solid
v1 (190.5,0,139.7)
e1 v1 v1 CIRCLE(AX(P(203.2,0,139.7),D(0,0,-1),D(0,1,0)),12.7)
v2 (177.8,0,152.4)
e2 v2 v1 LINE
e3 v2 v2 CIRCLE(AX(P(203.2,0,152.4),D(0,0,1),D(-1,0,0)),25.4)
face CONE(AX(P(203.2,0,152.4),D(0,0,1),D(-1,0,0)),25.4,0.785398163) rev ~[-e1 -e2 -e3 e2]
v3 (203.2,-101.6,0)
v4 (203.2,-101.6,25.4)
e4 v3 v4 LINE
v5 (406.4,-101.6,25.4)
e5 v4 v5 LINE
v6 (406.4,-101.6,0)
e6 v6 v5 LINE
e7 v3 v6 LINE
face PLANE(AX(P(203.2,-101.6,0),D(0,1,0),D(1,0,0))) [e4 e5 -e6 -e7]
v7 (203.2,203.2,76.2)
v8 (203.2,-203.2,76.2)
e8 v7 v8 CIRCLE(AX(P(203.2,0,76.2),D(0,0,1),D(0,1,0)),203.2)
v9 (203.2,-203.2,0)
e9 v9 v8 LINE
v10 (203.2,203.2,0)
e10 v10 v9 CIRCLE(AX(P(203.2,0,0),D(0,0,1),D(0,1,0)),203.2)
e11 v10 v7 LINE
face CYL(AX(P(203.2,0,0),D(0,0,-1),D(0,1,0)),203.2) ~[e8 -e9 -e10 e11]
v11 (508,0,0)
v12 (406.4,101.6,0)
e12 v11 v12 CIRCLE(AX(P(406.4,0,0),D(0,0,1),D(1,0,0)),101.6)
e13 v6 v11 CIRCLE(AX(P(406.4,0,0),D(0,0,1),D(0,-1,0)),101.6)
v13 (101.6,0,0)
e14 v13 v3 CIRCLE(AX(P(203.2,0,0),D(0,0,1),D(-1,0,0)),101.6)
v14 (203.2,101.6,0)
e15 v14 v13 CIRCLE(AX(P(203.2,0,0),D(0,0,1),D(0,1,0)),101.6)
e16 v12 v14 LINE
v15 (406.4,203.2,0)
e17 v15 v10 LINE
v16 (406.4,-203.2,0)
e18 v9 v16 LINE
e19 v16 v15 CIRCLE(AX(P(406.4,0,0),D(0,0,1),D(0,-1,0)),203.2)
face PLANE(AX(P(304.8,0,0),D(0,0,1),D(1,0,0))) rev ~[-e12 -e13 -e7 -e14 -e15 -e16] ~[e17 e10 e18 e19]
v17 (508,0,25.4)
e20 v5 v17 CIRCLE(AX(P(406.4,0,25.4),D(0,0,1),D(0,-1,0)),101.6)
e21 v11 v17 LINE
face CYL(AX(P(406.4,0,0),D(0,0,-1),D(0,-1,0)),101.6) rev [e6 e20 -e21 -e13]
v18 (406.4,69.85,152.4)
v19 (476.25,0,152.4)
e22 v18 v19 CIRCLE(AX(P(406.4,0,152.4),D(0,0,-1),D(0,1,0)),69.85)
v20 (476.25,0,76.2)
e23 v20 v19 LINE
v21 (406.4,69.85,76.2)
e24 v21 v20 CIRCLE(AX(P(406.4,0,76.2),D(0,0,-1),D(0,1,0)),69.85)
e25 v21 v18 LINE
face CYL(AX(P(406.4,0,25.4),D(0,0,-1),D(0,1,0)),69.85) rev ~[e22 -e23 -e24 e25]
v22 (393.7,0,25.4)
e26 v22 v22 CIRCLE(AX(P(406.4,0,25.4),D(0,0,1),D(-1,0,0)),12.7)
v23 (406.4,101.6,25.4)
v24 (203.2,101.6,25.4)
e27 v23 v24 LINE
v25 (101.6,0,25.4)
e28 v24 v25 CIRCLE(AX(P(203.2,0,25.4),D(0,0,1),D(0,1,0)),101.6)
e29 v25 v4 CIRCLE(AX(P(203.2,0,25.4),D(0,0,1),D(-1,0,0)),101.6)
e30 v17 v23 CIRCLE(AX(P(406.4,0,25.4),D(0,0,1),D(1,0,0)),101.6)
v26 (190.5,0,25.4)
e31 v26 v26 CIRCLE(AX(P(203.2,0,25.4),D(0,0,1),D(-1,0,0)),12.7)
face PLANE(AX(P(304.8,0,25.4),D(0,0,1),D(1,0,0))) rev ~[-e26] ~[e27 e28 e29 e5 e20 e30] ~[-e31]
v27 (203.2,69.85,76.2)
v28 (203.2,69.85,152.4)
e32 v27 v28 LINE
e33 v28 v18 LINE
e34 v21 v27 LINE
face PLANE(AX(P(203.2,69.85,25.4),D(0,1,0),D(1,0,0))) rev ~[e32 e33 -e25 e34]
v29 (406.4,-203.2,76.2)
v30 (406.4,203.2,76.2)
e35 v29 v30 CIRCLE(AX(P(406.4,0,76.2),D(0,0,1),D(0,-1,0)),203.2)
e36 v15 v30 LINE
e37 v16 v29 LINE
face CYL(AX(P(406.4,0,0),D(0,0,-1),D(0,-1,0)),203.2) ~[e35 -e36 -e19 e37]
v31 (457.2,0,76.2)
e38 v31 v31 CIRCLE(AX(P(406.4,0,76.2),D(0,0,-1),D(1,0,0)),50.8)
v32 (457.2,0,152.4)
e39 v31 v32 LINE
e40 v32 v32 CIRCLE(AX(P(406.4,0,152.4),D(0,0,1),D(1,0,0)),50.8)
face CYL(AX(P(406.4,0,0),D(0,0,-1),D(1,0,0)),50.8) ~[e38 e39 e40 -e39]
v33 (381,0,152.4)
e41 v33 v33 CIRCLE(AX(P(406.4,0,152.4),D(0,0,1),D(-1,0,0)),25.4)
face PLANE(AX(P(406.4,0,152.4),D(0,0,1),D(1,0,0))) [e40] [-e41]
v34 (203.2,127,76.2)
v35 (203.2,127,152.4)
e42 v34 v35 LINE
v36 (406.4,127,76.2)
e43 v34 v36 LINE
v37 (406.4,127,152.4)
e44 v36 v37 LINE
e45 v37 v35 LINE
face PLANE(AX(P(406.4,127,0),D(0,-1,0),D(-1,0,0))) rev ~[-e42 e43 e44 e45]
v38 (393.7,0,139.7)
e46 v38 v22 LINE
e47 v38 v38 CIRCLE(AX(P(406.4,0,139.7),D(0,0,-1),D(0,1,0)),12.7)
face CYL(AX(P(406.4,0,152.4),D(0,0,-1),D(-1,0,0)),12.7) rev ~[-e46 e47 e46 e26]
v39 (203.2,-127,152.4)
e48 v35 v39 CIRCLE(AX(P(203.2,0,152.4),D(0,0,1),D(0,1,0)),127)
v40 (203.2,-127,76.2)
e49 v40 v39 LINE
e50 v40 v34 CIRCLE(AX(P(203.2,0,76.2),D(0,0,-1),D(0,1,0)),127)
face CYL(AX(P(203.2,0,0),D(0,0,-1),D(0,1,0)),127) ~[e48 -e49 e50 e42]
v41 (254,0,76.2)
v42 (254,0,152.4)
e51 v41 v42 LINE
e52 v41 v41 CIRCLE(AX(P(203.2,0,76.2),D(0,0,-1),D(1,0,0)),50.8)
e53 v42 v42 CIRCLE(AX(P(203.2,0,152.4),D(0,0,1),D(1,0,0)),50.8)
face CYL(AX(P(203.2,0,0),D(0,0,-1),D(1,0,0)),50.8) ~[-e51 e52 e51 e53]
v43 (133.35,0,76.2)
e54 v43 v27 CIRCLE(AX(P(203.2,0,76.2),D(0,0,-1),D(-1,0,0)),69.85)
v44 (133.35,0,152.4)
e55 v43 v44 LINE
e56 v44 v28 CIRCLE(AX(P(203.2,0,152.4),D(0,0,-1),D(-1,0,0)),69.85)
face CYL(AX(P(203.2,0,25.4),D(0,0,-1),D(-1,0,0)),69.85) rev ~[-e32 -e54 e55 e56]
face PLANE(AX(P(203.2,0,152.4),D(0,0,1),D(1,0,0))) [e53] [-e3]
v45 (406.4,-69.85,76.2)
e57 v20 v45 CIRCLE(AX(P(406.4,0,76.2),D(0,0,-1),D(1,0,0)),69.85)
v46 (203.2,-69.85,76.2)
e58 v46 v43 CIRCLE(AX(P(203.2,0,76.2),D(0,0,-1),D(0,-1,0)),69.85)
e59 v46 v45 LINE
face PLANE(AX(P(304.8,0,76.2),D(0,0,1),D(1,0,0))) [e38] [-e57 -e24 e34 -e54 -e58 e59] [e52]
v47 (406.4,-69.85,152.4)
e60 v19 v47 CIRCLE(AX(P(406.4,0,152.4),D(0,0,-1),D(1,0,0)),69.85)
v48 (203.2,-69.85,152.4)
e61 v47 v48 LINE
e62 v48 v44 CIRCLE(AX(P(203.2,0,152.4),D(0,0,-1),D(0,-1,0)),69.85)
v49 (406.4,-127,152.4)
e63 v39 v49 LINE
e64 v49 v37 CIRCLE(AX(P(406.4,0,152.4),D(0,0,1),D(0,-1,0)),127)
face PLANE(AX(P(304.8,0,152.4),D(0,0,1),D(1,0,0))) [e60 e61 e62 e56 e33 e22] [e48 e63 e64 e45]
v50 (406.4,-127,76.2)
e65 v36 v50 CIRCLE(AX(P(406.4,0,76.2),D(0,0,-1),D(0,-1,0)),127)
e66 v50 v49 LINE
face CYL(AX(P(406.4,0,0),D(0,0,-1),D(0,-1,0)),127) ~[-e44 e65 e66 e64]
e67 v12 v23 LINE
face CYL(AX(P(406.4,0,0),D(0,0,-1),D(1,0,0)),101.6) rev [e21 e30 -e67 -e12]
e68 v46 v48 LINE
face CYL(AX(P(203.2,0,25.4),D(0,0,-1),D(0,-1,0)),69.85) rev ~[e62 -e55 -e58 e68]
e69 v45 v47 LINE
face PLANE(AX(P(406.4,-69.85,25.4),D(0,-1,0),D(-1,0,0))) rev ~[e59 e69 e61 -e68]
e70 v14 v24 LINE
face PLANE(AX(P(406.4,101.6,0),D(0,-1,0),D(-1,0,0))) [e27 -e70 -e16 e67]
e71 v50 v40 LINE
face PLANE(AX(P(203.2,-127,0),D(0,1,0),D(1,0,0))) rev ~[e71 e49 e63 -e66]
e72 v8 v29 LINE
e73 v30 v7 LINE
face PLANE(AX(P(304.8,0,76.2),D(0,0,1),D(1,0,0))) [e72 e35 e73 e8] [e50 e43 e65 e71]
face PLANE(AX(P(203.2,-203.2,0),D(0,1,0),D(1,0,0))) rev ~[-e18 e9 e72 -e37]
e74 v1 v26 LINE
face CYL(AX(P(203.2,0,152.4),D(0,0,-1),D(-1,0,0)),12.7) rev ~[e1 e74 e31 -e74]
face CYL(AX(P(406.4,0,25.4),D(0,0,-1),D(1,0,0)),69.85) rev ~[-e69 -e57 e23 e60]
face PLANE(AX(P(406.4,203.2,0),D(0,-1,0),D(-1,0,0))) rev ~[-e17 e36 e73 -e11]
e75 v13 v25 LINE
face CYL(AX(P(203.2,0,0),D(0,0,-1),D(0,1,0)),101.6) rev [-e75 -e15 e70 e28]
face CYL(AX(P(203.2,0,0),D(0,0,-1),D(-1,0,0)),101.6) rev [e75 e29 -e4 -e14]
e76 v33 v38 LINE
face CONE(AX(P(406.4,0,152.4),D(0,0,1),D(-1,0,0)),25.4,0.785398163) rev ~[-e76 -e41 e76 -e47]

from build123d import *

# Parameters (mm, degrees)
F0_R           = 50.8
F0_R_2         = 12.7
F1_DEPTH       = 76.2
F2_DEPTH       = 152.4
F3_DEPTH       = 152.4
F4_DEPTH       = 25.4
F5_START       = 25.4
F5_DEPTH       = 127
F7_D           = 25.4
F7_CSINK_D     = 50.8
F7_CSINK_ANGLE = 90


# Not quite as in the source:
# - a feature names something its author has since deleted; it is built from what else it names


with BuildPart() as f1:
    # F0 (on Top) → F1 (new body)
    with BuildSketch(Plane.XY):
        with BuildLine():
            ThreePointArc((0, 0), (59.5159020629, -143.6840979371), (203.2, -203.2))
            Line((203.2, -203.2), (406.4, -203.2))
            ThreePointArc((406.4, -203.2), (550.0840979371, -143.6840979371), (609.6, 0))
            ThreePointArc((609.6, 0), (550.0840979371, 143.6840979371), (406.4, 203.2))
            Line((406.4, 203.2), (203.2, 203.2))
            ThreePointArc((203.2, 203.2), (59.5159020629, 143.6840979371), (0, 0))
        make_face()
        with BuildLine():
            Line((406.4, -127), (203.2, -127))
            ThreePointArc((203.2, -127), (113.3974387893, -89.8025612107), (76.2, 0))
            ThreePointArc((76.2, 0), (113.3974387893, 89.8025612107), (203.2, 127))
            Line((203.2, 127), (406.4, 127))
            ThreePointArc((406.4, 127), (496.2025612107, 89.8025612107), (533.4, 0))
            ThreePointArc((533.4, 0), (496.2025612107, -89.8025612107), (406.4, -127))
        make_face(mode=Mode.SUBTRACT)
        with BuildLine():
            ThreePointArc((76.2, 0), (113.3974387893, -89.8025612107), (203.2, -127))
            Line((203.2, -127), (406.4, -127))
            ThreePointArc((406.4, -127), (496.2025612107, -89.8025612107), (533.4, 0))
            ThreePointArc((533.4, 0), (496.2025612107, 89.8025612107), (406.4, 127))
            Line((406.4, 127), (203.2, 127))
            ThreePointArc((203.2, 127), (113.3974387893, 89.8025612107), (76.2, 0))
        make_face()
        with BuildLine():
            Line((406.4, -101.6), (203.2, -101.6))
            ThreePointArc((203.2, -101.6), (131.3579510314, -71.8420489686), (101.6, 0))
            ThreePointArc((101.6, 0), (131.3579510314, 71.8420489686), (203.2, 101.6))
            Line((203.2, 101.6), (406.4, 101.6))
            ThreePointArc((406.4, 101.6), (478.2420489686, 71.8420489686), (508, 0))
            ThreePointArc((508, 0), (478.2420489686, -71.8420489686), (406.4, -101.6))
        make_face(mode=Mode.SUBTRACT)
        with BuildLine():
            ThreePointArc((101.6, 0), (131.3579510314, -71.8420489686), (203.2, -101.6))
            Line((203.2, -101.6), (406.4, -101.6))
            ThreePointArc((406.4, -101.6), (478.2420489686, -71.8420489686), (508, 0))
            ThreePointArc((508, 0), (478.2420489686, 71.8420489686), (406.4, 101.6))
            Line((406.4, 101.6), (203.2, 101.6))
            ThreePointArc((203.2, 101.6), (131.3579510314, 71.8420489686), (101.6, 0))
        make_face()
        with BuildLine():
            ThreePointArc((476.25, 0), (455.7914086659, -49.3914086659), (406.4, -69.85))
            Line((406.4, -69.85), (203.2, -69.85))
            ThreePointArc((203.2, -69.85), (153.8085913341, -49.3914086659), (133.35, 0))
            ThreePointArc((133.35, 0), (153.8085913341, 49.3914086659), (203.2, 69.85))
            Line((203.2, 69.85), (406.4, 69.85))
            ThreePointArc((406.4, 69.85), (455.7914086659, 49.3914086659), (476.25, 0))
        make_face(mode=Mode.SUBTRACT)
        with BuildLine():
            Line((203.2, -69.85), (406.4, -69.85))
            ThreePointArc((406.4, -69.85), (455.7914086659, -49.3914086659), (476.25, 0))
            ThreePointArc((476.25, 0), (455.7914086659, 49.3914086659), (406.4, 69.85))
            Line((406.4, 69.85), (203.2, 69.85))
            ThreePointArc((203.2, 69.85), (153.8085913341, 49.3914086659), (133.35, 0))
            ThreePointArc((133.35, 0), (153.8085913341, -49.3914086659), (203.2, -69.85))
        make_face()
        with Locations((203.2, 0)):
            Circle(F0_R, mode=Mode.SUBTRACT)
        with Locations((406.4, 0)):
            Circle(F0_R, mode=Mode.SUBTRACT)
        with Locations((406.4, 0)):
            Circle(F0_R)
        with Locations((406.4, 0)):
            Circle(F0_R_2, mode=Mode.SUBTRACT)
        with Locations((203.2, 0)):
            Circle(F0_R)
        with Locations((203.2, 0)):
            Circle(F0_R_2, mode=Mode.SUBTRACT)
    extrude(amount=F1_DEPTH)

    # F0 (on Top) → F2 (join)
    with BuildSketch(Plane.XY):
        with BuildLine():
            ThreePointArc((76.2, 0), (113.3974387893, -89.8025612107), (203.2, -127))
            Line((203.2, -127), (406.4, -127))
            ThreePointArc((406.4, -127), (496.2025612107, -89.8025612107), (533.4, 0))
            ThreePointArc((533.4, 0), (496.2025612107, 89.8025612107), (406.4, 127))
            Line((406.4, 127), (203.2, 127))
            ThreePointArc((203.2, 127), (113.3974387893, 89.8025612107), (76.2, 0))
        make_face()
        with BuildLine():
            Line((406.4, -101.6), (203.2, -101.6))
            ThreePointArc((203.2, -101.6), (131.3579510314, -71.8420489686), (101.6, 0))
            ThreePointArc((101.6, 0), (131.3579510314, 71.8420489686), (203.2, 101.6))
            Line((203.2, 101.6), (406.4, 101.6))
            ThreePointArc((406.4, 101.6), (478.2420489686, 71.8420489686), (508, 0))
            ThreePointArc((508, 0), (478.2420489686, -71.8420489686), (406.4, -101.6))
        make_face(mode=Mode.SUBTRACT)
    extrude(amount=F2_DEPTH)

    # F0 (on Top) → F3 (join)
    with BuildSketch(Plane.XY):
        with Locations((203.2, 0)):
            Circle(F0_R)
        with Locations((203.2, 0)):
            Circle(F0_R_2, mode=Mode.SUBTRACT)
        with Locations((406.4, 0)):
            Circle(F0_R)
        with Locations((406.4, 0)):
            Circle(F0_R_2, mode=Mode.SUBTRACT)
        with Locations((203.2, 0)):
            Circle(F0_R_2)
        with Locations((406.4, 0)):
            Circle(F0_R_2)
    extrude(amount=F3_DEPTH)

    # F0 (on Top) → F4 (cut)
    with BuildSketch(Plane.XY):
        with BuildLine():
            ThreePointArc((101.6, 0), (131.3579510314, -71.8420489686), (203.2, -101.6))
            Line((203.2, -101.6), (406.4, -101.6))
            ThreePointArc((406.4, -101.6), (478.2420489686, -71.8420489686), (508, 0))
            ThreePointArc((508, 0), (478.2420489686, 71.8420489686), (406.4, 101.6))
            Line((406.4, 101.6), (203.2, 101.6))
            ThreePointArc((203.2, 101.6), (131.3579510314, 71.8420489686), (101.6, 0))
        make_face()
        with BuildLine():
            ThreePointArc((476.25, 0), (455.7914086659, -49.3914086659), (406.4, -69.85))
            Line((406.4, -69.85), (203.2, -69.85))
            ThreePointArc((203.2, -69.85), (153.8085913341, -49.3914086659), (133.35, 0))
            ThreePointArc((133.35, 0), (153.8085913341, 49.3914086659), (203.2, 69.85))
            Line((203.2, 69.85), (406.4, 69.85))
            ThreePointArc((406.4, 69.85), (455.7914086659, 49.3914086659), (476.25, 0))
        make_face(mode=Mode.SUBTRACT)
        with BuildLine():
            Line((203.2, -69.85), (406.4, -69.85))
            ThreePointArc((406.4, -69.85), (455.7914086659, -49.3914086659), (476.25, 0))
            ThreePointArc((476.25, 0), (455.7914086659, 49.3914086659), (406.4, 69.85))
            Line((406.4, 69.85), (203.2, 69.85))
            ThreePointArc((203.2, 69.85), (153.8085913341, 49.3914086659), (133.35, 0))
            ThreePointArc((133.35, 0), (153.8085913341, -49.3914086659), (203.2, -69.85))
        make_face()
        with Locations((203.2, 0)):
            Circle(F0_R, mode=Mode.SUBTRACT)
        with Locations((406.4, 0)):
            Circle(F0_R, mode=Mode.SUBTRACT)
        with Locations((203.2, 0)):
            Circle(F0_R)
        with Locations((203.2, 0)):
            Circle(F0_R_2, mode=Mode.SUBTRACT)
        with Locations((406.4, 0)):
            Circle(F0_R)
        with Locations((406.4, 0)):
            Circle(F0_R_2, mode=Mode.SUBTRACT)
    extrude(amount=F4_DEPTH, mode=Mode.SUBTRACT)

    # F0 (on Top) → F5 (join)
    with BuildSketch(Plane.XY.offset(F5_START)):
        with BuildLine():
            ThreePointArc((101.6, 0), (131.3579510314, -71.8420489686), (203.2, -101.6))
            Line((203.2, -101.6), (406.4, -101.6))
            ThreePointArc((406.4, -101.6), (478.2420489686, -71.8420489686), (508, 0))
            ThreePointArc((508, 0), (478.2420489686, 71.8420489686), (406.4, 101.6))
            Line((406.4, 101.6), (203.2, 101.6))
            ThreePointArc((203.2, 101.6), (131.3579510314, 71.8420489686), (101.6, 0))
        make_face()
        with BuildLine():
            ThreePointArc((476.25, 0), (455.7914086659, -49.3914086659), (406.4, -69.85))
            Line((406.4, -69.85), (203.2, -69.85))
            ThreePointArc((203.2, -69.85), (153.8085913341, -49.3914086659), (133.35, 0))
            ThreePointArc((133.35, 0), (153.8085913341, 49.3914086659), (203.2, 69.85))
            Line((203.2, 69.85), (406.4, 69.85))
            ThreePointArc((406.4, 69.85), (455.7914086659, 49.3914086659), (476.25, 0))
        make_face(mode=Mode.SUBTRACT)
    extrude(amount=F5_DEPTH)

    # F7 (through all)
    with Locations(Plane.XY.offset(152.4)):
        with Locations((203.2, 0), (406.4, 0)):
            CounterSinkHole(F7_D / 2, F7_CSINK_D / 2, counter_sink_angle=F7_CSINK_ANGLE)


solid = f1.part
